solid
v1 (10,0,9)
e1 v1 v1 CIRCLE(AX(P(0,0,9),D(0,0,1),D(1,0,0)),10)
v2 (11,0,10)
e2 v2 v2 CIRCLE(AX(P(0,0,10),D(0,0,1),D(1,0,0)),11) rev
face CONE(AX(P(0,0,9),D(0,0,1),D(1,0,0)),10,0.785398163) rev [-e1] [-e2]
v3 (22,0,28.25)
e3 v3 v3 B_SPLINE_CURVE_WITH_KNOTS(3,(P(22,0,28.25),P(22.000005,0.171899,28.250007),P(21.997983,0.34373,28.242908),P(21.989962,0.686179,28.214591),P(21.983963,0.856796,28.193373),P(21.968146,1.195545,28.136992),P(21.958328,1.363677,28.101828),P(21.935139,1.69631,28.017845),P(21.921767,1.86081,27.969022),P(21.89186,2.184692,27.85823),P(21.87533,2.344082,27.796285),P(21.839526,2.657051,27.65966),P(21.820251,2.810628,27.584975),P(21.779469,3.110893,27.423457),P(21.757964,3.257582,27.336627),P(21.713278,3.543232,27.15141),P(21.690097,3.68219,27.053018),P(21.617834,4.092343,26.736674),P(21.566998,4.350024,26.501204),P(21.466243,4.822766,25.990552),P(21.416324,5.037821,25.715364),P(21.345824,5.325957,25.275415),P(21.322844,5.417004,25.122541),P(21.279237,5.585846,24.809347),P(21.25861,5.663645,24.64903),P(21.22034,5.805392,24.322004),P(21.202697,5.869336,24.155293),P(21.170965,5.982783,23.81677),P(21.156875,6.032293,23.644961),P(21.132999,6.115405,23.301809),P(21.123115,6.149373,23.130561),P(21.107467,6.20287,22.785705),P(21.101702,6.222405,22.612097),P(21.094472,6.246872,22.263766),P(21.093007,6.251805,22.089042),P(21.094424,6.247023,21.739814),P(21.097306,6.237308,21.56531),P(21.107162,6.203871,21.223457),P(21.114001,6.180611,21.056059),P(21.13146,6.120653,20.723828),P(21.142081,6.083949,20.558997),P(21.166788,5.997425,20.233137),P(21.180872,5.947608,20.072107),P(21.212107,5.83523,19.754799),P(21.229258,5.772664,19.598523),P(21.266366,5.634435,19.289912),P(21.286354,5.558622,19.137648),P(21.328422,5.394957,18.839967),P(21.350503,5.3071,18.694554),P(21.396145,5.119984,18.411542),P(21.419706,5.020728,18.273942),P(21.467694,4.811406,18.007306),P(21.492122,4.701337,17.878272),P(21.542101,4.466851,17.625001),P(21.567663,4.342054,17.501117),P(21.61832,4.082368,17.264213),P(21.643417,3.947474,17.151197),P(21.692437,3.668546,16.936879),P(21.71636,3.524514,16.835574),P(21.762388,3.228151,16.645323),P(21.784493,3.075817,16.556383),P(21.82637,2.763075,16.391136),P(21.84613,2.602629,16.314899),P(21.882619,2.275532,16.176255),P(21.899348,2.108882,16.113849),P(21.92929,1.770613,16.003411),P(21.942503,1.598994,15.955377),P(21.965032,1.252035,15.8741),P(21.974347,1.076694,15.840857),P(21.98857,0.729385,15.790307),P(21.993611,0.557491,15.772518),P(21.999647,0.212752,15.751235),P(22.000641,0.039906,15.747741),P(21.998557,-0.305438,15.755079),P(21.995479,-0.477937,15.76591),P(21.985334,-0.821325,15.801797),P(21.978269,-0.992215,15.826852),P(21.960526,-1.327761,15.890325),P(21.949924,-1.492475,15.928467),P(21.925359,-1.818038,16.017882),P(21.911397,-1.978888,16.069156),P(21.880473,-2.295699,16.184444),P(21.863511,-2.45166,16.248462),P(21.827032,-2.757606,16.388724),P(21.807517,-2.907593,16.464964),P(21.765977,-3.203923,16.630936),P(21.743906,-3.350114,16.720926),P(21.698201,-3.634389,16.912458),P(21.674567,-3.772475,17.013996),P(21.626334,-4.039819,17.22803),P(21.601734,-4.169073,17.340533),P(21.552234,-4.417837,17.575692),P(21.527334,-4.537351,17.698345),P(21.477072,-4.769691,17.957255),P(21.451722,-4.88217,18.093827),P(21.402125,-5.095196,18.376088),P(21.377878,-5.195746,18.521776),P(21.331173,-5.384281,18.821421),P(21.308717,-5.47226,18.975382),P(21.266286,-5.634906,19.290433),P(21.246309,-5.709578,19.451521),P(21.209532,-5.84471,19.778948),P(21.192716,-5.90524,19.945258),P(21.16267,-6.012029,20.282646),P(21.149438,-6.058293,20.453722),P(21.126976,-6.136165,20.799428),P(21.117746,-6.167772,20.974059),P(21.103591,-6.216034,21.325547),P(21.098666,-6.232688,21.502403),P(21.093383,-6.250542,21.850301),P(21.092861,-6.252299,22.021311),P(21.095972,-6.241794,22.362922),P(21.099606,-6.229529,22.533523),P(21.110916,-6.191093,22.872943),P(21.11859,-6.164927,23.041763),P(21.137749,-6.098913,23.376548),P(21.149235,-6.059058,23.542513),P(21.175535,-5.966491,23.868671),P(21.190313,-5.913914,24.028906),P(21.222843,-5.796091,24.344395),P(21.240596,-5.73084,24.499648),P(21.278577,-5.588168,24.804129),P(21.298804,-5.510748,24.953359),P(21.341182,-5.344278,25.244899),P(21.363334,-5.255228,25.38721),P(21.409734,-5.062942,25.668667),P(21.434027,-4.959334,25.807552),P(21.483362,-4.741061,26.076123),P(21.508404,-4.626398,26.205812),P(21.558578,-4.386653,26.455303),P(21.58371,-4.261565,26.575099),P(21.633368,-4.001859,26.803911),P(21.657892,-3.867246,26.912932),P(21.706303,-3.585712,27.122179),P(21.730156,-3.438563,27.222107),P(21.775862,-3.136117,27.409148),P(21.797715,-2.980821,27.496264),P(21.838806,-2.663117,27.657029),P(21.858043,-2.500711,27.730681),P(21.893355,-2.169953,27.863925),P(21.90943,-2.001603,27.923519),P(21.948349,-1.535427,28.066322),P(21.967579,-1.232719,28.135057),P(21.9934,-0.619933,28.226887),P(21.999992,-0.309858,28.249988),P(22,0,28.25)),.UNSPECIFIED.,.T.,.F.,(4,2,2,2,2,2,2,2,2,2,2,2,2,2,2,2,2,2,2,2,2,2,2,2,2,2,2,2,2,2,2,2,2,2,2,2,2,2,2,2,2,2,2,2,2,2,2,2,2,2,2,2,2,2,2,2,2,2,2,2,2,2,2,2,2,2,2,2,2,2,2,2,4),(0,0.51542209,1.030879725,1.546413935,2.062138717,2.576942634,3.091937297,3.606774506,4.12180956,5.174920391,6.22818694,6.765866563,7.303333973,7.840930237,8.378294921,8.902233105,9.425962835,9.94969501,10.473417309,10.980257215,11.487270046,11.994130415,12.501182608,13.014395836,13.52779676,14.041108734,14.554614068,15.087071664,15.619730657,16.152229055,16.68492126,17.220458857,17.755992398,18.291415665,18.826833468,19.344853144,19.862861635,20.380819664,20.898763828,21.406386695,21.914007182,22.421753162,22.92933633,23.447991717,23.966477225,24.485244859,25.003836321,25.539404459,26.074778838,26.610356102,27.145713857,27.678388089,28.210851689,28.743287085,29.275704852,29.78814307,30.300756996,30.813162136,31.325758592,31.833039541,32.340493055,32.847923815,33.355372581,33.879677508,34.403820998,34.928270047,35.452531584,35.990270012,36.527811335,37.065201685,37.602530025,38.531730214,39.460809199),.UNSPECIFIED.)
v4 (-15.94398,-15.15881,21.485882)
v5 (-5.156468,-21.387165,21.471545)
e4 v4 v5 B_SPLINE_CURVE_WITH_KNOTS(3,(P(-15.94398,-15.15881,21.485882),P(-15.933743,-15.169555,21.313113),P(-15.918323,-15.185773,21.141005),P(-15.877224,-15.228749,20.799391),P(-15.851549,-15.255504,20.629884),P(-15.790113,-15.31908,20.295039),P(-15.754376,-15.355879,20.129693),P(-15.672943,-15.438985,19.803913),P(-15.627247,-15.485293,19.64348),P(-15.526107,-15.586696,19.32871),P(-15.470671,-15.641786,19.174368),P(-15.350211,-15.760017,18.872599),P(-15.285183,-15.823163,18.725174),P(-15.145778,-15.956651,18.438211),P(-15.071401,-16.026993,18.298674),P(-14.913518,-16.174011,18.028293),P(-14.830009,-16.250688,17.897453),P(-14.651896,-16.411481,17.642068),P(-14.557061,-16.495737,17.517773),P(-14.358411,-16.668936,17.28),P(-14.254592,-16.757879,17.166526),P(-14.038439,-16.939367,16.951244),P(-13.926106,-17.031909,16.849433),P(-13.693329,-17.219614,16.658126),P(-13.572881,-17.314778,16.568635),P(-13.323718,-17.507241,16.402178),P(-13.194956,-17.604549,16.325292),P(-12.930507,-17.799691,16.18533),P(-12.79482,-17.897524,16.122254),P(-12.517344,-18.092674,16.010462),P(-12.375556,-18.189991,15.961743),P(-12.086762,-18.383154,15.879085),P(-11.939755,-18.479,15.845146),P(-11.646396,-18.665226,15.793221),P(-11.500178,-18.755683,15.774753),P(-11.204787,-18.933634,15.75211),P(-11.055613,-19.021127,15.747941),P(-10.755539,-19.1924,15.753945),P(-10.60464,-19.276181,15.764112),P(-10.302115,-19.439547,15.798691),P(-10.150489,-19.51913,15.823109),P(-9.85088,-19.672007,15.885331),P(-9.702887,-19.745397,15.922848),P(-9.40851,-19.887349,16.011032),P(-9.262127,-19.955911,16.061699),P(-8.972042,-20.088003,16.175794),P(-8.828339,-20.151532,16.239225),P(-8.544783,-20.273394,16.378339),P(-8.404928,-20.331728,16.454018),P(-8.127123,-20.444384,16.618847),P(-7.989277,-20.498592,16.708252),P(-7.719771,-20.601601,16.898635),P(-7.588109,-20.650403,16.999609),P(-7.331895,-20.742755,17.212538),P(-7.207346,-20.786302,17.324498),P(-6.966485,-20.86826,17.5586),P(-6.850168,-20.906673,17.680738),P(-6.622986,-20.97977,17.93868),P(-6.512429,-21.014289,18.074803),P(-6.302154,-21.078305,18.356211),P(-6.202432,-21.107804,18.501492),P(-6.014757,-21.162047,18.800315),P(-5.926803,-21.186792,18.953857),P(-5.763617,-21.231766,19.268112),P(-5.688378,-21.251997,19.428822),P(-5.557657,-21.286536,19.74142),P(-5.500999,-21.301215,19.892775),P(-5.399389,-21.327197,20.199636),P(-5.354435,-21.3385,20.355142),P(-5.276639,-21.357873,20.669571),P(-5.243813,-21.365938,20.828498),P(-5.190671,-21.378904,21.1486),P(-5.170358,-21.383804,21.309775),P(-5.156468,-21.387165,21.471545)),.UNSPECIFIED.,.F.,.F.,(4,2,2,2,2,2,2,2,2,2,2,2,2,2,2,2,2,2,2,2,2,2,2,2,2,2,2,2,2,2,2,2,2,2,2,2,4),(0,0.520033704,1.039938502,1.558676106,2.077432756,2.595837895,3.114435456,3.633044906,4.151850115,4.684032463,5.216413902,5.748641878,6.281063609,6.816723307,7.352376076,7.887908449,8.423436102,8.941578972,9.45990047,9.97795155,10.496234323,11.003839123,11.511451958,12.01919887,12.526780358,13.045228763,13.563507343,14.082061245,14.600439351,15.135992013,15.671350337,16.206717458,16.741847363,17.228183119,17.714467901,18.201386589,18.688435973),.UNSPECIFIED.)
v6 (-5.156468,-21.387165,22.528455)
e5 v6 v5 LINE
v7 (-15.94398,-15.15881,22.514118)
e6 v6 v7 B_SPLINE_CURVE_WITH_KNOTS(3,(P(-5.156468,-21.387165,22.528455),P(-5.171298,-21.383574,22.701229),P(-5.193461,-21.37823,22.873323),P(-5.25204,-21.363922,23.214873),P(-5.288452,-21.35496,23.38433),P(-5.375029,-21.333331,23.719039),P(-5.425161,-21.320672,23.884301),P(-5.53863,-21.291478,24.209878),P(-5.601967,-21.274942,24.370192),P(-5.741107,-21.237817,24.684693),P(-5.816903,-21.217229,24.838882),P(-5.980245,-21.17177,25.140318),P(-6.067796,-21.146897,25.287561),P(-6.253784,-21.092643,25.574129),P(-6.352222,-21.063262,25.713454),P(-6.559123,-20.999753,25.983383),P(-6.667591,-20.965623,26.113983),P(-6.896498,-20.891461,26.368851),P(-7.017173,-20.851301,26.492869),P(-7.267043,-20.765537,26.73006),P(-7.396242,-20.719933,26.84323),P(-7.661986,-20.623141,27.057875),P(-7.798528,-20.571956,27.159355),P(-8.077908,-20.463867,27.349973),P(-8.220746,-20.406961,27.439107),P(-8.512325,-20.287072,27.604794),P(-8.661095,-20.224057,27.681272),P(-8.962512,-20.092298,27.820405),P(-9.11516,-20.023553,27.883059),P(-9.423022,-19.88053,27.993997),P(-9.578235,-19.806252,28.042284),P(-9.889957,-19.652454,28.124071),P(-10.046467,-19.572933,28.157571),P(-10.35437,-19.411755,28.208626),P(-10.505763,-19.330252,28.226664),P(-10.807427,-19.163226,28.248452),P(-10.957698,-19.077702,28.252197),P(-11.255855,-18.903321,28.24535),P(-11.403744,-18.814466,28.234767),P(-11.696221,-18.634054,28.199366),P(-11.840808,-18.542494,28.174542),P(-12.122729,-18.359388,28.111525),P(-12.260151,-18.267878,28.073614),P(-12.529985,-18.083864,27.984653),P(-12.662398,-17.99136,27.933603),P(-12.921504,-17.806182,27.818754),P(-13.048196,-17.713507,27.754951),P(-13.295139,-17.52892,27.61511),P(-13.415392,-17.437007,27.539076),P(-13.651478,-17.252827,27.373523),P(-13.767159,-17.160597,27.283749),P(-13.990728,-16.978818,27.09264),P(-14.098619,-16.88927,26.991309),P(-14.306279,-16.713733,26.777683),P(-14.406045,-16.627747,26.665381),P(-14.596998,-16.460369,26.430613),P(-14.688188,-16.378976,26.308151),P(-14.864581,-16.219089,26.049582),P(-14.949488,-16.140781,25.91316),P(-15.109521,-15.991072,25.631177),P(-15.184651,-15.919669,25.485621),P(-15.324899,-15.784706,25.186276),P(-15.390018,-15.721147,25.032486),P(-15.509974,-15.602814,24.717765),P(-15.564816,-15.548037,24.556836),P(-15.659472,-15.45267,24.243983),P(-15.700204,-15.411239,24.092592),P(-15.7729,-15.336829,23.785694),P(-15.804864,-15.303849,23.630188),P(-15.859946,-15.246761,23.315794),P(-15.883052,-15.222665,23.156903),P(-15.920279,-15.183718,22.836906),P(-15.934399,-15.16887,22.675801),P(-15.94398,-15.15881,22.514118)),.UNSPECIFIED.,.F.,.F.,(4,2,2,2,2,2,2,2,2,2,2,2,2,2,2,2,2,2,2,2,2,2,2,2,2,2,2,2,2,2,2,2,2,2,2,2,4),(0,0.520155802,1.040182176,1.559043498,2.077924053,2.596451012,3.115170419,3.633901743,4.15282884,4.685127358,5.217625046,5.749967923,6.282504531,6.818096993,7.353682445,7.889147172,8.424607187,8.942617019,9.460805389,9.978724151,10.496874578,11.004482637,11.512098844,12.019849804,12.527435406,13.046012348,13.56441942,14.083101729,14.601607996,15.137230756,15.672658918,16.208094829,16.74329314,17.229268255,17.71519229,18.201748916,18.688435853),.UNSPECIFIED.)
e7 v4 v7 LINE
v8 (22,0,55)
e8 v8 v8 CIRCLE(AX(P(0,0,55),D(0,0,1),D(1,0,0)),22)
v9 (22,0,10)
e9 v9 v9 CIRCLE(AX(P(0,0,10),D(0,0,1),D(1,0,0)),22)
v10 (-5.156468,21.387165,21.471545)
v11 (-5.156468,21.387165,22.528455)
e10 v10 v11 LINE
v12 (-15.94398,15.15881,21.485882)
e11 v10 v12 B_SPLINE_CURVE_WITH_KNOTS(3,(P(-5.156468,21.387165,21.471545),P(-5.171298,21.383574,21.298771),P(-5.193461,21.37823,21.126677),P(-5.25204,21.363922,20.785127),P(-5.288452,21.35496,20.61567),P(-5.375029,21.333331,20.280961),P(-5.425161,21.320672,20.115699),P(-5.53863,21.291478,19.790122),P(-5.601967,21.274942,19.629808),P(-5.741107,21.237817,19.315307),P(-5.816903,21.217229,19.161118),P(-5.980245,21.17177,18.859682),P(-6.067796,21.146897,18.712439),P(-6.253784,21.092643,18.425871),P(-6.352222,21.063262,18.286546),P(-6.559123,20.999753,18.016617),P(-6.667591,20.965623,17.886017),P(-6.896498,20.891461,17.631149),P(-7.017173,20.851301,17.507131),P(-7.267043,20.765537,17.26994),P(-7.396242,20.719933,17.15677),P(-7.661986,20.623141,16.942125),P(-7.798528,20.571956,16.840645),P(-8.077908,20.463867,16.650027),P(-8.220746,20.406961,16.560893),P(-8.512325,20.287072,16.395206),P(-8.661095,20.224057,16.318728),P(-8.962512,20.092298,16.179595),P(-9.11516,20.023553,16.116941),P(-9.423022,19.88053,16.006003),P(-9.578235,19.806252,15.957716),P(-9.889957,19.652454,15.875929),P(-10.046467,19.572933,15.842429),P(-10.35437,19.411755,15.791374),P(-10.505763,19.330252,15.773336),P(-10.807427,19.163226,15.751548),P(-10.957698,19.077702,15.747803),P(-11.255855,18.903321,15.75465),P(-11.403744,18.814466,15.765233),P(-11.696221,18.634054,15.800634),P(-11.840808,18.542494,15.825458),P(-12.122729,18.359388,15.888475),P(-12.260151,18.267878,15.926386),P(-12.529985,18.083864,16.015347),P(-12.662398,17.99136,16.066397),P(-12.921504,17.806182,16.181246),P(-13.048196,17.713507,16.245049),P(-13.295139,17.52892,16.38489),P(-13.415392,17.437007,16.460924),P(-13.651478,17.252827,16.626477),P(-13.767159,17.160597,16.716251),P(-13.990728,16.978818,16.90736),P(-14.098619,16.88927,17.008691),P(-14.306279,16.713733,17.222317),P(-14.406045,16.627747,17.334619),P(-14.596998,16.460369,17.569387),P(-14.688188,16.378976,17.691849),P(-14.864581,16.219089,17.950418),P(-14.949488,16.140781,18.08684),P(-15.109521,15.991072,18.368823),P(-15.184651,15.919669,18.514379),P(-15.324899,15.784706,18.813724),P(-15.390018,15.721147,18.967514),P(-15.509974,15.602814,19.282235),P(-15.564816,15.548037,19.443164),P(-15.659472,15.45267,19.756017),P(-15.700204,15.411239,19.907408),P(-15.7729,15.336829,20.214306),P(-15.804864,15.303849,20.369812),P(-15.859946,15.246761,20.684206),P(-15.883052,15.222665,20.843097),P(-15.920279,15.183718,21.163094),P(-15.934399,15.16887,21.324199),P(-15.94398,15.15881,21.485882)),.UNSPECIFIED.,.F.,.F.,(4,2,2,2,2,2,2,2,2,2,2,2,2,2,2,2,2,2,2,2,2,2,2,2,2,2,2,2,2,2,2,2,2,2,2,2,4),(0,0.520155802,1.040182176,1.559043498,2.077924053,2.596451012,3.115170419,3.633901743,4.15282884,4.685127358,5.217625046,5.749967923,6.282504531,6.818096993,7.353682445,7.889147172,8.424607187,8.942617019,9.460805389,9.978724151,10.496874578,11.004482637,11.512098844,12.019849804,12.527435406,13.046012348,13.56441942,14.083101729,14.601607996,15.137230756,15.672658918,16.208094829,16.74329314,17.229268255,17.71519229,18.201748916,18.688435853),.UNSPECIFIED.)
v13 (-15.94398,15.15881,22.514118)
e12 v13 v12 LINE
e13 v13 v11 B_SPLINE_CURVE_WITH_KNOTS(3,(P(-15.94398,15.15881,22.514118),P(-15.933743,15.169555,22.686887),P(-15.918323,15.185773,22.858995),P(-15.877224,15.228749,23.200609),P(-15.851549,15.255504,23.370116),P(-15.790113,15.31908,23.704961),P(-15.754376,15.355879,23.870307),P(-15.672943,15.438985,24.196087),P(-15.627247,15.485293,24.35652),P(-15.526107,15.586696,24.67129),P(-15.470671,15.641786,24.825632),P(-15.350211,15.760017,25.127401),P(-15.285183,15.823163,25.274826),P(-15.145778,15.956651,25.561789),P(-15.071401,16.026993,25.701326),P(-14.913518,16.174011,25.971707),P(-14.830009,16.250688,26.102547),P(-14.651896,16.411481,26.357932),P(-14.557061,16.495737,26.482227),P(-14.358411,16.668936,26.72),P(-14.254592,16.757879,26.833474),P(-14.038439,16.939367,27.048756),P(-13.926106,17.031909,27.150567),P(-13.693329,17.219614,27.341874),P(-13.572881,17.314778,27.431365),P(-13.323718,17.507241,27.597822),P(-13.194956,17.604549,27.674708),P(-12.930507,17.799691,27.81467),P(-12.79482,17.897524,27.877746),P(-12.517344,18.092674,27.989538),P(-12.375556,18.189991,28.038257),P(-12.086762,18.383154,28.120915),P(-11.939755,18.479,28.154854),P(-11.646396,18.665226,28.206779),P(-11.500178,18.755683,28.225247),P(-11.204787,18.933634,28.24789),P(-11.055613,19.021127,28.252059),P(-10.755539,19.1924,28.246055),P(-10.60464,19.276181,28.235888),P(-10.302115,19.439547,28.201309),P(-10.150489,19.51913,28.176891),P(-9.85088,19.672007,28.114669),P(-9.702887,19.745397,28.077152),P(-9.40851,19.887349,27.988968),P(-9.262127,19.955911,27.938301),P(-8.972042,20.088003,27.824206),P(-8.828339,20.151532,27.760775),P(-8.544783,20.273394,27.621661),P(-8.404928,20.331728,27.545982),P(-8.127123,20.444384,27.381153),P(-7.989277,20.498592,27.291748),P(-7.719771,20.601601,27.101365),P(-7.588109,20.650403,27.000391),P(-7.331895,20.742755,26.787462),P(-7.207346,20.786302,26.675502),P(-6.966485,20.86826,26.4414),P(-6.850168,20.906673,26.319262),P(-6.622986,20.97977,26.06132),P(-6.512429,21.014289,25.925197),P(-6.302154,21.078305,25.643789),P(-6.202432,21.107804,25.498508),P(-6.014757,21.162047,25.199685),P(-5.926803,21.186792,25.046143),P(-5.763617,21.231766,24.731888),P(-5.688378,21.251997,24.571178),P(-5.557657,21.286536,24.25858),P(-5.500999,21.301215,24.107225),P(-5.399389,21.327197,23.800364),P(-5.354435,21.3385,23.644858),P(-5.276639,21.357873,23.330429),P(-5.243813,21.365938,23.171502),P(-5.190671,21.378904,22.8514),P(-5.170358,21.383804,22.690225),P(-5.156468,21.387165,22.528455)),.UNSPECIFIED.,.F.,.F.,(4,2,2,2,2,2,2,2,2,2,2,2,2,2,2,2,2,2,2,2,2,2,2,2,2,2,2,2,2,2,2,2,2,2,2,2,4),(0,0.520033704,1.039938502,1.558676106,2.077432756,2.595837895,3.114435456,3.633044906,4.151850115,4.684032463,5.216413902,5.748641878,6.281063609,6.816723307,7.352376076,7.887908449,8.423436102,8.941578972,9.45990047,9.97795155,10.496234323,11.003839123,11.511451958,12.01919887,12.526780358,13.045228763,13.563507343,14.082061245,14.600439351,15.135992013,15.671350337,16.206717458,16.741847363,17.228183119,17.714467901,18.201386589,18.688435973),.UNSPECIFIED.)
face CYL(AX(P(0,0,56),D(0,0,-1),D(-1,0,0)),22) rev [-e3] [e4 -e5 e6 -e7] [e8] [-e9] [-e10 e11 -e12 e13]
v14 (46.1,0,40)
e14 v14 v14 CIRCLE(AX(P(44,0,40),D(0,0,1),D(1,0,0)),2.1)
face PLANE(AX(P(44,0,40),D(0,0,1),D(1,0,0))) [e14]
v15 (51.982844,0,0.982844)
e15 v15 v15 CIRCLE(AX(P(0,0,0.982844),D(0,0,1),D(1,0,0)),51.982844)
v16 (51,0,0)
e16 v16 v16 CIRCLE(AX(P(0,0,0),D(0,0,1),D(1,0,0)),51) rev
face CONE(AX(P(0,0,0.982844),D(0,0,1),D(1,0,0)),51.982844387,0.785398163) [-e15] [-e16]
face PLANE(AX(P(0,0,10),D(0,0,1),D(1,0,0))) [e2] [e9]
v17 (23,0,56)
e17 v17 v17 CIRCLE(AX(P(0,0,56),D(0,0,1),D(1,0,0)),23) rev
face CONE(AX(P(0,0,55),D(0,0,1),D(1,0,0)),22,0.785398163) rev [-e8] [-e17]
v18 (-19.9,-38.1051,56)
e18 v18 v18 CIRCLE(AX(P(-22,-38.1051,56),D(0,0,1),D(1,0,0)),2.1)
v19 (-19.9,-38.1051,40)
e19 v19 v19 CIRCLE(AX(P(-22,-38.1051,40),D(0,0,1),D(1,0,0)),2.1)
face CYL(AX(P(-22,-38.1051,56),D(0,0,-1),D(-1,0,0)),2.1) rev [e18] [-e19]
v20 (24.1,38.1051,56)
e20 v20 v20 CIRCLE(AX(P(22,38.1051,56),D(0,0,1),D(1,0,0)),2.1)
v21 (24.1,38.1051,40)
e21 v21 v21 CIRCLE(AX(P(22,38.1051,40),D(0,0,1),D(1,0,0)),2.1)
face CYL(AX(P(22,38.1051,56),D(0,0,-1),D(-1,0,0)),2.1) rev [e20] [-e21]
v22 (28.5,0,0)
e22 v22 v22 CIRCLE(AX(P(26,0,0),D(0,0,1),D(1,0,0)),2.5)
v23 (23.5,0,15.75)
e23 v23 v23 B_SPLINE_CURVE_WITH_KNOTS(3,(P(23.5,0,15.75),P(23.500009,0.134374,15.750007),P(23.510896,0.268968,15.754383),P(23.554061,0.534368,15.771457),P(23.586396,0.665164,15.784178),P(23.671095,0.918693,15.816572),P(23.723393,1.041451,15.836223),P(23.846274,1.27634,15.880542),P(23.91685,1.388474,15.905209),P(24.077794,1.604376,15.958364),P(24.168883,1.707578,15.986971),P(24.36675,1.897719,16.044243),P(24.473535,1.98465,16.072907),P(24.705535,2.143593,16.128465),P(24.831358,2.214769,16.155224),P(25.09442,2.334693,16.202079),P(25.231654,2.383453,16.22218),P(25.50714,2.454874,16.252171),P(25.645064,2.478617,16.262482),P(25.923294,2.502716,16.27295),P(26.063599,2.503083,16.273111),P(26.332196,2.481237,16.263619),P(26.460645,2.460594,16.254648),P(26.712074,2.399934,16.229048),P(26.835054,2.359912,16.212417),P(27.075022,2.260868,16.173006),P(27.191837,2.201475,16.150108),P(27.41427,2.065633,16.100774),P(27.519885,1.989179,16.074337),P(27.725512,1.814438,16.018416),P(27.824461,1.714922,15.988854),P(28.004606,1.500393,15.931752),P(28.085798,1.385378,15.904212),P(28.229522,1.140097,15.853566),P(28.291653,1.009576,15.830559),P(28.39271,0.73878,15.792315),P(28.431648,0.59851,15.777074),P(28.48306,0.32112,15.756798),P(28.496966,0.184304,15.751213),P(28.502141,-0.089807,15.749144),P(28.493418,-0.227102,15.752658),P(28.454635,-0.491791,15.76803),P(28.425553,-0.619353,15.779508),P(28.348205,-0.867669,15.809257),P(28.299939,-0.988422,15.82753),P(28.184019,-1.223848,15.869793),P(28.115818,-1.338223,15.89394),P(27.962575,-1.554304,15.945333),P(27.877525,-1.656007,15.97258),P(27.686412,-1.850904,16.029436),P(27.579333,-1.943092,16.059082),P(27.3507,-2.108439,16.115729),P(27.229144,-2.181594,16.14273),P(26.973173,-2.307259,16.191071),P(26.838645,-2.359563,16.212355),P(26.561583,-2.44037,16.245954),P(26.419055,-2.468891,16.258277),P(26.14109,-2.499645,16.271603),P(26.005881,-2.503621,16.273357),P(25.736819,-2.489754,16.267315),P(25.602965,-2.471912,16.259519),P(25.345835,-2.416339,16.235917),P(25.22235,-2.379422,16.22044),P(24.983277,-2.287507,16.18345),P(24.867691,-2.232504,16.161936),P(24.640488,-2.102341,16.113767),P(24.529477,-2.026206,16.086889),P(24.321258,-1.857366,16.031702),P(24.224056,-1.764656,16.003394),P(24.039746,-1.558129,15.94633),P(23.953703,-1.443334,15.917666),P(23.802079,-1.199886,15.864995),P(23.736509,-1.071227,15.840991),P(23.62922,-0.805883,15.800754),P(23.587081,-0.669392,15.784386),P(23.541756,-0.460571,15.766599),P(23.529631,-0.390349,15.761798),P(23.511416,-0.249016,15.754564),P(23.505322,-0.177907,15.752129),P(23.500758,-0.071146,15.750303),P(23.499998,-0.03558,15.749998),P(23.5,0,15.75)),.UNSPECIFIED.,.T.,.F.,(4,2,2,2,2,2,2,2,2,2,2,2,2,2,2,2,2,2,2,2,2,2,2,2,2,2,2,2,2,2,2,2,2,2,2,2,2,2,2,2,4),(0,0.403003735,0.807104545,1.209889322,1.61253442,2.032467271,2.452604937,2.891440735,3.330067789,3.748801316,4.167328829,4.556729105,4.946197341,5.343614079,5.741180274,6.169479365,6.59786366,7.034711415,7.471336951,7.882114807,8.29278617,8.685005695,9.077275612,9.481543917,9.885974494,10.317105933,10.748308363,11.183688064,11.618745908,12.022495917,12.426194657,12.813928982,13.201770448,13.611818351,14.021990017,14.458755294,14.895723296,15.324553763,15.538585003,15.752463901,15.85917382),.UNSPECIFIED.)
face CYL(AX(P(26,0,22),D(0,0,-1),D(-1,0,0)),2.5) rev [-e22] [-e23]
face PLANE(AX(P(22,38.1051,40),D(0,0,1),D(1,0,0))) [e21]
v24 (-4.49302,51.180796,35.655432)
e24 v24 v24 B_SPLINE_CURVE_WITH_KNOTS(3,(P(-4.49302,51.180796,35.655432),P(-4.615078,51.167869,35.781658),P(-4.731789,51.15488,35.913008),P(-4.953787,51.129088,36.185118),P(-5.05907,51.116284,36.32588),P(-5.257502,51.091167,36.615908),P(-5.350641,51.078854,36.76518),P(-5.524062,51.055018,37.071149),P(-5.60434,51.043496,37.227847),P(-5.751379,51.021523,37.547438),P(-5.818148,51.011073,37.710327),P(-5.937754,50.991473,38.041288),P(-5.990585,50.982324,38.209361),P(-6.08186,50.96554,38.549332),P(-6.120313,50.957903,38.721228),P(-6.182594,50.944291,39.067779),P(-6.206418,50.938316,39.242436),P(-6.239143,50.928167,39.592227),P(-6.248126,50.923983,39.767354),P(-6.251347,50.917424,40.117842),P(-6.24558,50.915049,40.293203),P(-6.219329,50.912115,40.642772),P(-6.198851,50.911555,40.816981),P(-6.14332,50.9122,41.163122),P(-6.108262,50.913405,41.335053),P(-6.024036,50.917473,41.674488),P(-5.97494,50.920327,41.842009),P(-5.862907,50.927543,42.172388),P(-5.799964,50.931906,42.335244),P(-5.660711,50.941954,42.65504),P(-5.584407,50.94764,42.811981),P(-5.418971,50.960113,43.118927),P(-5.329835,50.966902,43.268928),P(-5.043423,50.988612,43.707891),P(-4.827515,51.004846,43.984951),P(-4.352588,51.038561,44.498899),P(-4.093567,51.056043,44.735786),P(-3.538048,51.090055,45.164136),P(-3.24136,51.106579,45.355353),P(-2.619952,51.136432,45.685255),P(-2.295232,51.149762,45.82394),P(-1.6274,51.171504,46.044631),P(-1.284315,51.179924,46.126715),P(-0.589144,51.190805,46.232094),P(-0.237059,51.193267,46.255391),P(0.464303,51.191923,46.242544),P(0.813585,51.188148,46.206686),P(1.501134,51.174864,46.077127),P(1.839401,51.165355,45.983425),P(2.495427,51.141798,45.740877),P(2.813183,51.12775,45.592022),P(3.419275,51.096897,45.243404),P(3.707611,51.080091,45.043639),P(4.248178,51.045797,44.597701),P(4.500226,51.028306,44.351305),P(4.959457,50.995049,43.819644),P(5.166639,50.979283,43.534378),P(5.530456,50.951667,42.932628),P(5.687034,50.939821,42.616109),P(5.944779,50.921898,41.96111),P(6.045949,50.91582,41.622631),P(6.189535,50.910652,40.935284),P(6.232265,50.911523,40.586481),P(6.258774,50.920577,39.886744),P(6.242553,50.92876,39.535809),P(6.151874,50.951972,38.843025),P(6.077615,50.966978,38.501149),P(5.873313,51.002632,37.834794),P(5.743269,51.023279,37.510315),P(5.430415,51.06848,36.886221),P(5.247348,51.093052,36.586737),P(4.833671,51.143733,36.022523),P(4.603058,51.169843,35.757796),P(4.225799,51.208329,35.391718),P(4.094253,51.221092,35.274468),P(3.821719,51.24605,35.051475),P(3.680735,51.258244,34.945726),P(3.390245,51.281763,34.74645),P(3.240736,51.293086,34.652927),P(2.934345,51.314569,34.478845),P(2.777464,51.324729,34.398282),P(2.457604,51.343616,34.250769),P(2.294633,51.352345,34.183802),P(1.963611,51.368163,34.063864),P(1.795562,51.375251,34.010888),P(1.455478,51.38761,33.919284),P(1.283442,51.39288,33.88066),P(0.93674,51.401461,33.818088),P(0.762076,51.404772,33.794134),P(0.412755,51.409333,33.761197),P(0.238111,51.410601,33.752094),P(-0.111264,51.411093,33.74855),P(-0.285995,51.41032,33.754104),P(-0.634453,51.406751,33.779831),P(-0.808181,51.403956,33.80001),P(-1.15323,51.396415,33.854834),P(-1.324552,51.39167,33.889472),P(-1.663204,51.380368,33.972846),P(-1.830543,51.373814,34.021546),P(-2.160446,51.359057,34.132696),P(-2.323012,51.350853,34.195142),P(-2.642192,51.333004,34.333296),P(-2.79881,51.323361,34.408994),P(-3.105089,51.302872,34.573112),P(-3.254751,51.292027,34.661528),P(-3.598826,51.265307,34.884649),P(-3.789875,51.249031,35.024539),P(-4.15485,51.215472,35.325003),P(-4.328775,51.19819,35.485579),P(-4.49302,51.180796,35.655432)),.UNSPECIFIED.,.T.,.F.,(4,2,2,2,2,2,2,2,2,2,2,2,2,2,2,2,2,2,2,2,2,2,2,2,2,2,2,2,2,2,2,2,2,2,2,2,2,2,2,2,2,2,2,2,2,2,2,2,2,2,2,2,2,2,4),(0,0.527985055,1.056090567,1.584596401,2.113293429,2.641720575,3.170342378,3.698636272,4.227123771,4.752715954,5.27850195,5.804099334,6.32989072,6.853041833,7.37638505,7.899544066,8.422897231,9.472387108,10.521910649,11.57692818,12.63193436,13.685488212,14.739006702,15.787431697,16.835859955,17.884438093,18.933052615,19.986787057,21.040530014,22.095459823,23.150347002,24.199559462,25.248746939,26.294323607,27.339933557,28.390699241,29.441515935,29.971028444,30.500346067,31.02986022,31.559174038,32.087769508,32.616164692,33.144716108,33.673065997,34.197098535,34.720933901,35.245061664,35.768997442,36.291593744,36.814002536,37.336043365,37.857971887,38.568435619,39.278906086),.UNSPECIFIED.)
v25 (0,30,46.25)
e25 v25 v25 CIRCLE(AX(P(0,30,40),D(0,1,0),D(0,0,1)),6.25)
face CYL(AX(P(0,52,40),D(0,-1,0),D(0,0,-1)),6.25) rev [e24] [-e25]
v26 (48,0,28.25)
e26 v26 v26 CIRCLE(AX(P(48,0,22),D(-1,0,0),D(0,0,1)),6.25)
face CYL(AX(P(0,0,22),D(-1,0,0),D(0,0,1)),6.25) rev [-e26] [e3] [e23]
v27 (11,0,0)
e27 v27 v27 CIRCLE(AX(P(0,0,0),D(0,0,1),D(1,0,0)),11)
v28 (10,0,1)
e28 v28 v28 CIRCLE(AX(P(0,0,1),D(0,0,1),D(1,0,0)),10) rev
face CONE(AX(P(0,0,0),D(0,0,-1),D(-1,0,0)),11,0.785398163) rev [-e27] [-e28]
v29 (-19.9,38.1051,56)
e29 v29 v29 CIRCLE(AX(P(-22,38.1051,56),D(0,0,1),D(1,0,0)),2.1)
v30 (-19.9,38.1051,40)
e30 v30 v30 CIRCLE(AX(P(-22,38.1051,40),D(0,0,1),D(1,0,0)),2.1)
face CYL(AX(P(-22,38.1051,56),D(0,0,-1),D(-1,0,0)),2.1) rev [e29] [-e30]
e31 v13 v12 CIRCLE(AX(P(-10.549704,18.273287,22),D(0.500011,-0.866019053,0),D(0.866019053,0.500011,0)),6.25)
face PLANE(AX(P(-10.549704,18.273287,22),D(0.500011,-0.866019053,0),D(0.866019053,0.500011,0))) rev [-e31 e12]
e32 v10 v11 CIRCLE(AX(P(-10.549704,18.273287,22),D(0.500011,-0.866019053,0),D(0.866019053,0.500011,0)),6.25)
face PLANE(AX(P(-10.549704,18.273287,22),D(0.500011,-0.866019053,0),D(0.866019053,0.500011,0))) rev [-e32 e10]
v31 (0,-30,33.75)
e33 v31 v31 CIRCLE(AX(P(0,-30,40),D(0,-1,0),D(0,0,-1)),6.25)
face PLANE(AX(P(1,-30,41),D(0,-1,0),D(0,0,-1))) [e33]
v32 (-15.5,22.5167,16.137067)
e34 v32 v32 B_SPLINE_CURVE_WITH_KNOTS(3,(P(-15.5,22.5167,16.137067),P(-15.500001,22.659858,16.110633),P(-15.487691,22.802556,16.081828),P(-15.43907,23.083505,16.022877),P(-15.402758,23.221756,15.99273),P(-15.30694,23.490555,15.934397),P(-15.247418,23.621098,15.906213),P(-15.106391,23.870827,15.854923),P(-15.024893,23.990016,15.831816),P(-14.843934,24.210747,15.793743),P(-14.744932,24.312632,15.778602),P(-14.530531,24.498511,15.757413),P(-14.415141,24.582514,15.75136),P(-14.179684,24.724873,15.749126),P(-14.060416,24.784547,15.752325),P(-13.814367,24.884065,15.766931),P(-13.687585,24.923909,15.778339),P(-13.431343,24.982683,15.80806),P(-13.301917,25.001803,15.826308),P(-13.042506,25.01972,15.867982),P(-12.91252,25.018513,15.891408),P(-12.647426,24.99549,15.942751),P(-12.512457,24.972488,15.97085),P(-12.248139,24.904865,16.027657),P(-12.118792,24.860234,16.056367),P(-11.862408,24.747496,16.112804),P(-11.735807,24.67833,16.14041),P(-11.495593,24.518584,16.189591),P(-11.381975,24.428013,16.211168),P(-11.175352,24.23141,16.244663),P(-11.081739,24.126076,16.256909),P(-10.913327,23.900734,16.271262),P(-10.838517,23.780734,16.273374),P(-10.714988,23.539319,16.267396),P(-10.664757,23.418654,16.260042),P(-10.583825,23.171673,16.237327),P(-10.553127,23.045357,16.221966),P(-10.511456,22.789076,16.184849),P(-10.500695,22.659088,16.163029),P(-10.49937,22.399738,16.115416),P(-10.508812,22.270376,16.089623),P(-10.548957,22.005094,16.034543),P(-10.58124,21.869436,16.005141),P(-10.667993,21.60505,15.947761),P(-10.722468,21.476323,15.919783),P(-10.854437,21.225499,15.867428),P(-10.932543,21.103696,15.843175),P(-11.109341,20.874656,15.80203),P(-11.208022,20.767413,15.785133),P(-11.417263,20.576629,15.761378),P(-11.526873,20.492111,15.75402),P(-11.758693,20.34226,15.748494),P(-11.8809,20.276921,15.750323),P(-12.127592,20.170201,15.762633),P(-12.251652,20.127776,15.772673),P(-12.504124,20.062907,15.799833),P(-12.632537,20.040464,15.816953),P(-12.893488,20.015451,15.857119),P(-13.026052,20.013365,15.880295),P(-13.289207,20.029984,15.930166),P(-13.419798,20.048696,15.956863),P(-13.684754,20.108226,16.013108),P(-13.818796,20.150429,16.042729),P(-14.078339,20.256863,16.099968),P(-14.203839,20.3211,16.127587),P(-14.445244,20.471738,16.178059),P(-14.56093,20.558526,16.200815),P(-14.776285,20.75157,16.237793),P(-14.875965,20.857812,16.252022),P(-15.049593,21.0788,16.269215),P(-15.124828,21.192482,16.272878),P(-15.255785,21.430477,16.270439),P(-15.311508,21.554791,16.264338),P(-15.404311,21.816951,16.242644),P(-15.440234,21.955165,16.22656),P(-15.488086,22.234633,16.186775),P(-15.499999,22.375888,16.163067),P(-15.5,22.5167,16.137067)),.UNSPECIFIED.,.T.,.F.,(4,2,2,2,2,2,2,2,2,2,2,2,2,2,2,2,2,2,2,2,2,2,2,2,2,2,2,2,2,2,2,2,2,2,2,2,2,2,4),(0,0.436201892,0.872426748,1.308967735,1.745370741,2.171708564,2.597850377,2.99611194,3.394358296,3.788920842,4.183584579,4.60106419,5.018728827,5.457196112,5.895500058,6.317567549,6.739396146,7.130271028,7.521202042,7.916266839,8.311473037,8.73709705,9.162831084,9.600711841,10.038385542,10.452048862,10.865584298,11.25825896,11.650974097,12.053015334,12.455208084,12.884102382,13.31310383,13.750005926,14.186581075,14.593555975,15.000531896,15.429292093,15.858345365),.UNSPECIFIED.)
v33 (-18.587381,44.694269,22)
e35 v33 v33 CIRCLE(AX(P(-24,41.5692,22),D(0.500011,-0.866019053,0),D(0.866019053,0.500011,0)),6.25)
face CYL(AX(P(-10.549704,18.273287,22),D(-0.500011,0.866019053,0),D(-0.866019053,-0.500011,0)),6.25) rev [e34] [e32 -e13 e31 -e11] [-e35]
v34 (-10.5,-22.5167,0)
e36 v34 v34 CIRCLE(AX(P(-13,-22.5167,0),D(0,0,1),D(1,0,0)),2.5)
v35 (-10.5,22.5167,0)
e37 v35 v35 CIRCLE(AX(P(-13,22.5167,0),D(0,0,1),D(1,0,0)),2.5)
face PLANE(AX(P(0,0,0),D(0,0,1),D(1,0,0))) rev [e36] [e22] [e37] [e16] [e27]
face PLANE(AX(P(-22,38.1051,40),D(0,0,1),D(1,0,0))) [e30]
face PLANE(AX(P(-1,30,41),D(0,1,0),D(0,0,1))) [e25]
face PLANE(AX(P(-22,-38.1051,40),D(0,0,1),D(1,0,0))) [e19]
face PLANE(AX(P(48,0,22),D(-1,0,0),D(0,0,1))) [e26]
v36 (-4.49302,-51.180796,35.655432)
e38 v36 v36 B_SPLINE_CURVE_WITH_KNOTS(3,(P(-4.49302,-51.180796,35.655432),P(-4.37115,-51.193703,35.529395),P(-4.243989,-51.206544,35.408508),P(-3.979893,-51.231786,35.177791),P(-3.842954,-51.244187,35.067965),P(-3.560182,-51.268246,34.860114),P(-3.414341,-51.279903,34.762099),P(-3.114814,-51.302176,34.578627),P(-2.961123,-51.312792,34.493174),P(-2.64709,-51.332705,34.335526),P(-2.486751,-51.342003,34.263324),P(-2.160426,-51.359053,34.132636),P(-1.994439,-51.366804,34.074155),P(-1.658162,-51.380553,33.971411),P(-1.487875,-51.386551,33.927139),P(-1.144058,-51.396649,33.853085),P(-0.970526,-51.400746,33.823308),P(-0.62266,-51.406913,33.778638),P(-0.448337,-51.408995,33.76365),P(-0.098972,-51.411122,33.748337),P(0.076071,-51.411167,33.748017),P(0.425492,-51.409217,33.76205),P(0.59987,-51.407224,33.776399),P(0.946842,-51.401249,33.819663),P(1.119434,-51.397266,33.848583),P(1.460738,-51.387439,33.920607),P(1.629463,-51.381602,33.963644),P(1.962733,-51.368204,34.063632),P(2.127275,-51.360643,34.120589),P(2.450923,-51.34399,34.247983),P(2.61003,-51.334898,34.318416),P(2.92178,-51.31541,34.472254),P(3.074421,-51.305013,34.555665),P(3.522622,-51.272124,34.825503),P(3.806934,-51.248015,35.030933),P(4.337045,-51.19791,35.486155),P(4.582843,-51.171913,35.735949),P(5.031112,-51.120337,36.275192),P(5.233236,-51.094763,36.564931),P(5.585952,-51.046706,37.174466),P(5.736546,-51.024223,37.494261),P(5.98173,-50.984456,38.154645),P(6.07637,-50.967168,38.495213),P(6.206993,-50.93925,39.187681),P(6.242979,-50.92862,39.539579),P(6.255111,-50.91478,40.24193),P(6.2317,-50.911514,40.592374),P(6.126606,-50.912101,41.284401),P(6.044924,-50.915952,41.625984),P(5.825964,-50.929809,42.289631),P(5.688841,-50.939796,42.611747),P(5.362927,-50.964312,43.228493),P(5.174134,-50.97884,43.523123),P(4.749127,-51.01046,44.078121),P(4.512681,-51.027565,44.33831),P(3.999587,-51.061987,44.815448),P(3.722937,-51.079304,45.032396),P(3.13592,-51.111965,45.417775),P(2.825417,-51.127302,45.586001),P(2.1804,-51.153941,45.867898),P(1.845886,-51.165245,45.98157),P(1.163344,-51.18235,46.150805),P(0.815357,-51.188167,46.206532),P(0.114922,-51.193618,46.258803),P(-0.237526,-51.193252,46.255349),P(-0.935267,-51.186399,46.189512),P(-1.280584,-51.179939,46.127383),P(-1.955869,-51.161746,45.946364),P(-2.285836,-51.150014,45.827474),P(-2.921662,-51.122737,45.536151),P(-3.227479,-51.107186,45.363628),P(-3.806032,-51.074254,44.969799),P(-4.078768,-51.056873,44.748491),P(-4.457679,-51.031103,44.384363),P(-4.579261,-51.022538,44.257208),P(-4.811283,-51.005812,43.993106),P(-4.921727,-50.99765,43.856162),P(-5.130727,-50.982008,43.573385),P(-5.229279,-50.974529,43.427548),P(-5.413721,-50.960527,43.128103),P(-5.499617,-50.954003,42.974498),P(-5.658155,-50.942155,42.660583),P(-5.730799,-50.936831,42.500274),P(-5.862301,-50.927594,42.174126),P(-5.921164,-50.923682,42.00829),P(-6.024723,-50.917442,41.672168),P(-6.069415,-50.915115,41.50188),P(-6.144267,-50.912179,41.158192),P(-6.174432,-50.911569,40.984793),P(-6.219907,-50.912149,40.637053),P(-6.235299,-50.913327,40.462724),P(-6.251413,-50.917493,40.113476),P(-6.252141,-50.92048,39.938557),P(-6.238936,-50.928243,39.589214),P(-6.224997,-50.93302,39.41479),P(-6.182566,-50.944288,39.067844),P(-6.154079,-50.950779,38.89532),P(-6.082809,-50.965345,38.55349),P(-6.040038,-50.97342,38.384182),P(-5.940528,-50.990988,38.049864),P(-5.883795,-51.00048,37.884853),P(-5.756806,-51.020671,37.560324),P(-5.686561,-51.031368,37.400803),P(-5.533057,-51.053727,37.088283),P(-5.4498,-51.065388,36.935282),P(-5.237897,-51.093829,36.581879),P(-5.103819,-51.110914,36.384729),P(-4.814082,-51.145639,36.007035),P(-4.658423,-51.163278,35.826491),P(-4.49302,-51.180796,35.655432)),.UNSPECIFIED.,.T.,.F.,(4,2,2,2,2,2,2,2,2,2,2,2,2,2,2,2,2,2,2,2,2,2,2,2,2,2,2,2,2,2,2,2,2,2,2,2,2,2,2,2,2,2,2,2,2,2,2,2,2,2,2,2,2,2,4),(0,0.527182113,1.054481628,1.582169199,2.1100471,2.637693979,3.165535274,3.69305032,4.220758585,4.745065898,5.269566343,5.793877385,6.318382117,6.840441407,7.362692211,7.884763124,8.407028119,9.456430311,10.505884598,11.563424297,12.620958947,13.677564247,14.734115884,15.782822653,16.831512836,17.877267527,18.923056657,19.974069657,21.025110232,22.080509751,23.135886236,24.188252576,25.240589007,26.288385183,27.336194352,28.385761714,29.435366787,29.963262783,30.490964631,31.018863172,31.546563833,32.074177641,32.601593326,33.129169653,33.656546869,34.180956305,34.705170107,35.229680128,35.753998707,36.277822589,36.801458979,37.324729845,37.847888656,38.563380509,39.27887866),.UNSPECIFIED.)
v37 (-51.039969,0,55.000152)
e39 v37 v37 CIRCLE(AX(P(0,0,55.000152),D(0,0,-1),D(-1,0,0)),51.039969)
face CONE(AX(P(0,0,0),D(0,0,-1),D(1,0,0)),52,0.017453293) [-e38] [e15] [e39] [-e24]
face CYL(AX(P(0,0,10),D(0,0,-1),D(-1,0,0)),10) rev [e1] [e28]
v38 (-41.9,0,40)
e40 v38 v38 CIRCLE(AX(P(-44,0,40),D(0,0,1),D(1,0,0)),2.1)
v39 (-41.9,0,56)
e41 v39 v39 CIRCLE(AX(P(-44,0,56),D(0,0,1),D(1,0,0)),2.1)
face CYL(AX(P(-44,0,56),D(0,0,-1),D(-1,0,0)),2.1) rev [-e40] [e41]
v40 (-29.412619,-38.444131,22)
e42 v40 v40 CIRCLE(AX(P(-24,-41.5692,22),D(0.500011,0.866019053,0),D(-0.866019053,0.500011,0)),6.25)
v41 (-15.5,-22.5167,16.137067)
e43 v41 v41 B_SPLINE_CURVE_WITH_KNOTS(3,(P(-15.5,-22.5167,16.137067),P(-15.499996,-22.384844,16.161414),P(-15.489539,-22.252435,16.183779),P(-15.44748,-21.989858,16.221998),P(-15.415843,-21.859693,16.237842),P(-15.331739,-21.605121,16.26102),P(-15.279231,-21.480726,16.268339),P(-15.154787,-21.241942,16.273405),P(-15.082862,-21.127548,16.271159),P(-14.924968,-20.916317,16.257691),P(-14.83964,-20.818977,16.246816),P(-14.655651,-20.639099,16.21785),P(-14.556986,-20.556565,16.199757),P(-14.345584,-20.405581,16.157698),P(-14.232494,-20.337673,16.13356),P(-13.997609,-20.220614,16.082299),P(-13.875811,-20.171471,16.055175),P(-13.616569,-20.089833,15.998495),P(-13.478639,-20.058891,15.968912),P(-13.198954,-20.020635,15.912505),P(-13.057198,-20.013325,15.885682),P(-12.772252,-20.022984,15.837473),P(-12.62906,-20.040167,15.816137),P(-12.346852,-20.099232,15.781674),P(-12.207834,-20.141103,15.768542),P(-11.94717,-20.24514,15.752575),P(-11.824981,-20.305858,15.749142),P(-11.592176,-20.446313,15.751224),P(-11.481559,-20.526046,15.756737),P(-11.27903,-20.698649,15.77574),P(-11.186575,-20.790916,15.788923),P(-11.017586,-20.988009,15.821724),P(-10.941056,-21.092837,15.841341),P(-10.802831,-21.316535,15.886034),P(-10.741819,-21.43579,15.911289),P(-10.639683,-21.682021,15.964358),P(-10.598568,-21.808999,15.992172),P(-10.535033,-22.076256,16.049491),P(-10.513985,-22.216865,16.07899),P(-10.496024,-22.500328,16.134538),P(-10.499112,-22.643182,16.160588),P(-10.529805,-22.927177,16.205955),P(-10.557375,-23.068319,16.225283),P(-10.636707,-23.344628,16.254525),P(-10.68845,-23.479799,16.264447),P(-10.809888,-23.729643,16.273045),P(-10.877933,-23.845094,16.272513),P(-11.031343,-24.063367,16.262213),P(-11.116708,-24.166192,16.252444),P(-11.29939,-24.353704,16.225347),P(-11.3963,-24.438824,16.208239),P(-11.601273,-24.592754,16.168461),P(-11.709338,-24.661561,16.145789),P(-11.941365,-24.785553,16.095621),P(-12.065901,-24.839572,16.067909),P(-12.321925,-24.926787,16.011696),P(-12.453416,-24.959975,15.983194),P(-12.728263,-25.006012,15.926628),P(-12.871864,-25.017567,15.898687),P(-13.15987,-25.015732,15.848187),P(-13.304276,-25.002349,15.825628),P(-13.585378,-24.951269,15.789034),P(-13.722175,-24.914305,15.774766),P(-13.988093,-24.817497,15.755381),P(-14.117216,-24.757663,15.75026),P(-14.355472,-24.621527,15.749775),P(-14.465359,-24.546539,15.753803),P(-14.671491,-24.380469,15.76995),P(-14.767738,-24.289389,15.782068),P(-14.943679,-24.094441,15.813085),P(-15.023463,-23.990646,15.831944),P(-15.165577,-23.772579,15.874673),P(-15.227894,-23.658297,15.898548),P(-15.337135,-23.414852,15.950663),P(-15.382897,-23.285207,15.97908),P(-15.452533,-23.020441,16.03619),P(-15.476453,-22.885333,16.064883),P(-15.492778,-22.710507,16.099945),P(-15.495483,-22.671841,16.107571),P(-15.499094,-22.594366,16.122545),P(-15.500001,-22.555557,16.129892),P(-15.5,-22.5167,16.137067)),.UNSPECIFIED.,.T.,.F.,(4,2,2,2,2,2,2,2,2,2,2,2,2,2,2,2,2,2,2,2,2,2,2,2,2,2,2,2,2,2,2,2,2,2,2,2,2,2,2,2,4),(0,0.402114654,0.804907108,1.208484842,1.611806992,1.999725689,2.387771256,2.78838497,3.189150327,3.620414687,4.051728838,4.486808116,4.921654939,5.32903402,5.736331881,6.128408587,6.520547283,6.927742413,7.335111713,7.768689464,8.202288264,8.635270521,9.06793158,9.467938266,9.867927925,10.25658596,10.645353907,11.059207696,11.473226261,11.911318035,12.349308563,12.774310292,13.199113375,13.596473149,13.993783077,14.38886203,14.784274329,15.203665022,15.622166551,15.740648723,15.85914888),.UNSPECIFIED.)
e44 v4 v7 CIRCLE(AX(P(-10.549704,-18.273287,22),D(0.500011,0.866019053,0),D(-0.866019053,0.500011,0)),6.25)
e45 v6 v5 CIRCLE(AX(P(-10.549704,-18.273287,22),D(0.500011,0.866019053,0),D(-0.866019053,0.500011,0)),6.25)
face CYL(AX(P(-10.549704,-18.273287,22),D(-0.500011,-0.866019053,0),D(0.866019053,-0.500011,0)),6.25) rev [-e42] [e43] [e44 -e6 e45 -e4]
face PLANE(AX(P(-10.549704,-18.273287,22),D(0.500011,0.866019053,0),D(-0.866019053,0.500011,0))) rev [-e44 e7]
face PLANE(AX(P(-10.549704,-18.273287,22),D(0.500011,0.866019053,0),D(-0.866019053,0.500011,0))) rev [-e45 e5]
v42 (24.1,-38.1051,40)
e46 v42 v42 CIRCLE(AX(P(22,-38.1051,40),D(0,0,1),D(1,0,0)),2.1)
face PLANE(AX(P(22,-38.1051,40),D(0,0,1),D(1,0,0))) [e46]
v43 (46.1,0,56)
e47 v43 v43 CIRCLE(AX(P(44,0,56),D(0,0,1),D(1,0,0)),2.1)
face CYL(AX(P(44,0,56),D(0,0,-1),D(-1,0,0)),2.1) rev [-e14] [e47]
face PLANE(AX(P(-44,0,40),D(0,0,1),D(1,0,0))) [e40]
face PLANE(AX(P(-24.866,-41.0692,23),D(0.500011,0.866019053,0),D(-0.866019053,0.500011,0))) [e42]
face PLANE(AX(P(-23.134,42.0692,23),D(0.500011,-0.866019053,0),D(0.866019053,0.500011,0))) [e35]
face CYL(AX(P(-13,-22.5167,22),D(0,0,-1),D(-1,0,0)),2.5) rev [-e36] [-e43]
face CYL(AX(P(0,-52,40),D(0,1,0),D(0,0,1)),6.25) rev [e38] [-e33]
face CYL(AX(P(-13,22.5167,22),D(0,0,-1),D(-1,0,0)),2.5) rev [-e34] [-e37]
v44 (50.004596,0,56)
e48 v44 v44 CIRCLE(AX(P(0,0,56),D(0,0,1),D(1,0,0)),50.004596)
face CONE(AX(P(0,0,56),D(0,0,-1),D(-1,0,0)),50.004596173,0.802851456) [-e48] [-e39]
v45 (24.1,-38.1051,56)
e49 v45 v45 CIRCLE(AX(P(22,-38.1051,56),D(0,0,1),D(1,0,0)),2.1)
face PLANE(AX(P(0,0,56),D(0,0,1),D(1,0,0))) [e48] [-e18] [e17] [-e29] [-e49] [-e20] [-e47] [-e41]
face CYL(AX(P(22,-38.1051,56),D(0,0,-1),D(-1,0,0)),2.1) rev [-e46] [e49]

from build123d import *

# Parameters (mm, degrees)
SK_BODY_R          = 52
BODY_DRAFT1_DEPTH  = 56
BODY_DRAFT1_TAPER  = 1
SK_B20_R           = 10
CUT_B20_DEPTH      = 10
SK_PL0_W           = 27
SK_PL0_H           = 6.25
SK_CAV2_R          = 22
CUT_CAV44B_DEPTH   = 46
CUT_NOTCH120_DEPTH = 2
SK_H120_R          = 6.25
CUT_PL120C_DEPTH   = 26.9
CUT_NOTCH240_DEPTH = 2
SK_H240_R          = 6.25
CUT_PL240C_DEPTH   = 26.9
SK_P5_R            = 2.5
CUT_P5X3_DEPTH     = 22
CHAMFER_C1_SIZE    = 1
CHAMFER_C1_SIZE_2  = 0.982994102
CHAMFER_C1_SIZE_3  = 1.017920191
SK_M5V12_R         = 2.1
CUT_M5V12_DEPTH    = 16
SK_NOTCH90_W       = 2
SK_NOTCH90_H       = 0.8
CUT_NOTCH90_DEPTH  = 2
SK_OIL90_R         = 6.25
CUT_OIL90_DEPTH    = 22
SK_NOTCH270_W      = 2
SK_NOTCH270_H      = 0.8
CUT_NOTCH270_DEPTH = 2
CUT_OIL270_START   = 22
SK_OIL270_R        = 6.25
CUT_OIL270_DEPTH   = 22


with BuildPart() as part:
    # Sk_body → Body_draft1 (new body)
    with BuildSketch(Plane.XY):
        Circle(SK_BODY_R)
    extrude(amount=BODY_DRAFT1_DEPTH, taper=BODY_DRAFT1_TAPER)

    # Sk_b20 → Cut_b20 (cut)
    with BuildSketch(Plane.XY):
        Circle(SK_B20_R)
    extrude(amount=CUT_B20_DEPTH, mode=Mode.SUBTRACT)

    # Sk_pl0 → Cut_pl0 (revolve, cut)
    with BuildSketch(Plane.XY.offset(22), mode=Mode.PRIVATE) as cut_pl0_sk:
        with Locations((34.5, 3.125)):
            Rectangle(SK_PL0_W, SK_PL0_H)
    revolve(cut_pl0_sk.sketch.rotate(Axis((0, 0, 22), (1, 0, 0)), 90), axis=Axis((0, 0, 22), (1, 0, 0)), mode=Mode.SUBTRACT)

    # Sk_cav2 → Cut_cav44b (cut)
    with BuildSketch(Plane.XY.offset(10)):
        Circle(SK_CAV2_R)
    extrude(amount=CUT_CAV44B_DEPTH, mode=Mode.SUBTRACT)

    # Sk_notch120 → Cut_notch120 (cut)
    with BuildSketch(Plane.XY.offset(21)):
        Polygon((-24.466, 40.3764), (-22.734, 41.3764), (-23.134, 42.0692), (-24.866, 41.0692), align=None)
    extrude(amount=CUT_NOTCH120_DEPTH, mode=Mode.SUBTRACT)

    # Sk_h120 → Cut_pl120c (cut)
    with BuildSketch(Plane(origin=(-24.000519623, 41.568899987, 0), x_dir=(0.8660190526287386, 0.5000110003630143, 0), z_dir=(0.5000110003630142, -0.8660190526287385, 0))):
        with Locations(Location((0.000600013, 22, 0), (0, 0, 175.281583596))):
            Circle(SK_H120_R)
    extrude(amount=CUT_PL120C_DEPTH, mode=Mode.SUBTRACT)

    # Sk_notch240 → Cut_notch240 (cut)
    with BuildSketch(Plane.XY.offset(21)):
        Polygon((-22.734, -41.3764), (-24.466, -40.3764), (-24.866, -41.0692), (-23.134, -42.0692), align=None)
    extrude(amount=CUT_NOTCH240_DEPTH, mode=Mode.SUBTRACT)

    # Sk_h240 → Cut_pl240c (cut)
    with BuildSketch(Plane(origin=(-24.000519623, -41.568899987, 0), x_dir=(0.8660190526287386, -0.5000110003630143, 0), z_dir=(0.5000110003630142, 0.8660190526287385, 0))):
        with Locations(Location((0.000600013, -22, 0), (0, 0, 355.149686071))):
            Circle(SK_H240_R)
    extrude(amount=CUT_PL240C_DEPTH, mode=Mode.SUBTRACT)

    # Sk_p5 → Cut_p5x3 (cut)
    with BuildSketch(Plane.XY):
        with Locations(Location((26, 0, 0), (0, 0, 180))):
            Circle(SK_P5_R)
        with Locations(Location((-13, 22.5167, 0), (0, 0, 180))):
            Circle(SK_P5_R)
        with Locations(Location((-13, -22.5167, 0), (0, 0, 180))):
            Circle(SK_P5_R)
    extrude(amount=CUT_P5X3_DEPTH, mode=Mode.SUBTRACT)

    # Chamfer_C1
    # the kernel refuses this chamfer: 1.017920191, 1, 0.982994102 mm, written as the material it takes off along each edge
    with BuildSketch(Plane(origin=(0, 0, 56), x_dir=(1, 0, 0), z_dir=(0, -1, 0))) as chamfer_c1_piece_1:
        Polygon((22 + CHAMFER_C1_SIZE, 0), (22, -CHAMFER_C1_SIZE), (22, 0), align=None)
    revolve(axis=Axis((0, 0, 56), (0, 0, 1)), mode=Mode.SUBTRACT)
    with BuildSketch(Plane(origin=(0, 0, 10), x_dir=(1, 0, 0), z_dir=(0, -1, 0))) as chamfer_c1_piece_2:
        Polygon((10, -CHAMFER_C1_SIZE), (10 + CHAMFER_C1_SIZE, 0), (10, 0), align=None)
    revolve(axis=Axis((0, 0, 10), (0, 0, 1)), mode=Mode.SUBTRACT)
    with BuildSketch(Plane(origin=(0, 0, 0), x_dir=(1, 0, 0), z_dir=(0, -1, 0))) as chamfer_c1_piece_3:
        Polygon((10 + CHAMFER_C1_SIZE, 0), (10, CHAMFER_C1_SIZE), (10, 0), align=None)
    revolve(axis=Axis((0, 0, 0), (0, 0, 1)), mode=Mode.SUBTRACT)
    with BuildSketch(Plane(origin=(0, 0, 0), x_dir=(1, 0, 0), z_dir=(0, 1, 0))) as chamfer_c1_piece_4:
        Polygon((52 - CHAMFER_C1_SIZE, 0), (52 - CHAMFER_C1_SIZE_2 * 0.0174524064402, -CHAMFER_C1_SIZE_2 * 0.999847695326), (52, 0), align=None)
    revolve(axis=Axis((0, 0, 0), (0, 0, -1)), mode=Mode.SUBTRACT)
    with BuildSketch(Plane(origin=(0, 0, 56), x_dir=(1, 0, 0), z_dir=(0, 1, 0))) as chamfer_c1_piece_5:
        Polygon((51.022516364 + CHAMFER_C1_SIZE * 0.0174524064373, CHAMFER_C1_SIZE * 0.999847695156), (51.022516364 - CHAMFER_C1_SIZE_3, 0), (51.022516364, 0), align=None)
    revolve(axis=Axis((0, 0, 56), (0, 0, -1)), mode=Mode.SUBTRACT)

    # Sk_m5v12 → Cut_m5v12 (cut)
    with BuildSketch(Plane.XY.offset(40)):
        with Locations((44, 0)):
            Circle(SK_M5V12_R)
        with Locations((22, 38.1051)):
            Circle(SK_M5V12_R)
        with Locations((-22, 38.1051)):
            Circle(SK_M5V12_R)
        with Locations((-44, 0)):
            Circle(SK_M5V12_R)
        with Locations((-22, -38.1051)):
            Circle(SK_M5V12_R)
        with Locations((22, -38.1051)):
            Circle(SK_M5V12_R)
    extrude(amount=CUT_M5V12_DEPTH, mode=Mode.SUBTRACT)

    # Sk_notch90 → Cut_notch90 (cut)
    with BuildSketch(Plane.XY.offset(39)):
        with Locations((0, 30.4)):
            Rectangle(SK_NOTCH90_W, SK_NOTCH90_H)
    extrude(amount=CUT_NOTCH90_DEPTH, mode=Mode.SUBTRACT)

    # Sk_oil90 → Cut_oil90 (cut)
    with BuildSketch(Plane(origin=(0, 30, 0), x_dir=(1, 0, 0), z_dir=(0, 1, 0))):
        with Locations(Location((0, -40, 0), (0, 0, 135.962349207))):
            Circle(SK_OIL90_R)
    extrude(amount=CUT_OIL90_DEPTH, mode=Mode.SUBTRACT)

    # Sk_notch270 → Cut_notch270 (cut)
    with BuildSketch(Plane.XY.offset(39)):
        with Locations((0, -30.4)):
            Rectangle(SK_NOTCH270_W, SK_NOTCH270_H)
    extrude(amount=CUT_NOTCH270_DEPTH, mode=Mode.SUBTRACT)

    # Sk_oil270 → Cut_oil270 (cut)
    with BuildSketch(Plane.XZ.offset(30).offset(CUT_OIL270_START)):
        with Locations(Location((0, 40, 0), (0, 0, 224.037650793))):
            Circle(SK_OIL270_R)
    extrude(amount=-CUT_OIL270_DEPTH, mode=Mode.SUBTRACT)


solid = part.part
